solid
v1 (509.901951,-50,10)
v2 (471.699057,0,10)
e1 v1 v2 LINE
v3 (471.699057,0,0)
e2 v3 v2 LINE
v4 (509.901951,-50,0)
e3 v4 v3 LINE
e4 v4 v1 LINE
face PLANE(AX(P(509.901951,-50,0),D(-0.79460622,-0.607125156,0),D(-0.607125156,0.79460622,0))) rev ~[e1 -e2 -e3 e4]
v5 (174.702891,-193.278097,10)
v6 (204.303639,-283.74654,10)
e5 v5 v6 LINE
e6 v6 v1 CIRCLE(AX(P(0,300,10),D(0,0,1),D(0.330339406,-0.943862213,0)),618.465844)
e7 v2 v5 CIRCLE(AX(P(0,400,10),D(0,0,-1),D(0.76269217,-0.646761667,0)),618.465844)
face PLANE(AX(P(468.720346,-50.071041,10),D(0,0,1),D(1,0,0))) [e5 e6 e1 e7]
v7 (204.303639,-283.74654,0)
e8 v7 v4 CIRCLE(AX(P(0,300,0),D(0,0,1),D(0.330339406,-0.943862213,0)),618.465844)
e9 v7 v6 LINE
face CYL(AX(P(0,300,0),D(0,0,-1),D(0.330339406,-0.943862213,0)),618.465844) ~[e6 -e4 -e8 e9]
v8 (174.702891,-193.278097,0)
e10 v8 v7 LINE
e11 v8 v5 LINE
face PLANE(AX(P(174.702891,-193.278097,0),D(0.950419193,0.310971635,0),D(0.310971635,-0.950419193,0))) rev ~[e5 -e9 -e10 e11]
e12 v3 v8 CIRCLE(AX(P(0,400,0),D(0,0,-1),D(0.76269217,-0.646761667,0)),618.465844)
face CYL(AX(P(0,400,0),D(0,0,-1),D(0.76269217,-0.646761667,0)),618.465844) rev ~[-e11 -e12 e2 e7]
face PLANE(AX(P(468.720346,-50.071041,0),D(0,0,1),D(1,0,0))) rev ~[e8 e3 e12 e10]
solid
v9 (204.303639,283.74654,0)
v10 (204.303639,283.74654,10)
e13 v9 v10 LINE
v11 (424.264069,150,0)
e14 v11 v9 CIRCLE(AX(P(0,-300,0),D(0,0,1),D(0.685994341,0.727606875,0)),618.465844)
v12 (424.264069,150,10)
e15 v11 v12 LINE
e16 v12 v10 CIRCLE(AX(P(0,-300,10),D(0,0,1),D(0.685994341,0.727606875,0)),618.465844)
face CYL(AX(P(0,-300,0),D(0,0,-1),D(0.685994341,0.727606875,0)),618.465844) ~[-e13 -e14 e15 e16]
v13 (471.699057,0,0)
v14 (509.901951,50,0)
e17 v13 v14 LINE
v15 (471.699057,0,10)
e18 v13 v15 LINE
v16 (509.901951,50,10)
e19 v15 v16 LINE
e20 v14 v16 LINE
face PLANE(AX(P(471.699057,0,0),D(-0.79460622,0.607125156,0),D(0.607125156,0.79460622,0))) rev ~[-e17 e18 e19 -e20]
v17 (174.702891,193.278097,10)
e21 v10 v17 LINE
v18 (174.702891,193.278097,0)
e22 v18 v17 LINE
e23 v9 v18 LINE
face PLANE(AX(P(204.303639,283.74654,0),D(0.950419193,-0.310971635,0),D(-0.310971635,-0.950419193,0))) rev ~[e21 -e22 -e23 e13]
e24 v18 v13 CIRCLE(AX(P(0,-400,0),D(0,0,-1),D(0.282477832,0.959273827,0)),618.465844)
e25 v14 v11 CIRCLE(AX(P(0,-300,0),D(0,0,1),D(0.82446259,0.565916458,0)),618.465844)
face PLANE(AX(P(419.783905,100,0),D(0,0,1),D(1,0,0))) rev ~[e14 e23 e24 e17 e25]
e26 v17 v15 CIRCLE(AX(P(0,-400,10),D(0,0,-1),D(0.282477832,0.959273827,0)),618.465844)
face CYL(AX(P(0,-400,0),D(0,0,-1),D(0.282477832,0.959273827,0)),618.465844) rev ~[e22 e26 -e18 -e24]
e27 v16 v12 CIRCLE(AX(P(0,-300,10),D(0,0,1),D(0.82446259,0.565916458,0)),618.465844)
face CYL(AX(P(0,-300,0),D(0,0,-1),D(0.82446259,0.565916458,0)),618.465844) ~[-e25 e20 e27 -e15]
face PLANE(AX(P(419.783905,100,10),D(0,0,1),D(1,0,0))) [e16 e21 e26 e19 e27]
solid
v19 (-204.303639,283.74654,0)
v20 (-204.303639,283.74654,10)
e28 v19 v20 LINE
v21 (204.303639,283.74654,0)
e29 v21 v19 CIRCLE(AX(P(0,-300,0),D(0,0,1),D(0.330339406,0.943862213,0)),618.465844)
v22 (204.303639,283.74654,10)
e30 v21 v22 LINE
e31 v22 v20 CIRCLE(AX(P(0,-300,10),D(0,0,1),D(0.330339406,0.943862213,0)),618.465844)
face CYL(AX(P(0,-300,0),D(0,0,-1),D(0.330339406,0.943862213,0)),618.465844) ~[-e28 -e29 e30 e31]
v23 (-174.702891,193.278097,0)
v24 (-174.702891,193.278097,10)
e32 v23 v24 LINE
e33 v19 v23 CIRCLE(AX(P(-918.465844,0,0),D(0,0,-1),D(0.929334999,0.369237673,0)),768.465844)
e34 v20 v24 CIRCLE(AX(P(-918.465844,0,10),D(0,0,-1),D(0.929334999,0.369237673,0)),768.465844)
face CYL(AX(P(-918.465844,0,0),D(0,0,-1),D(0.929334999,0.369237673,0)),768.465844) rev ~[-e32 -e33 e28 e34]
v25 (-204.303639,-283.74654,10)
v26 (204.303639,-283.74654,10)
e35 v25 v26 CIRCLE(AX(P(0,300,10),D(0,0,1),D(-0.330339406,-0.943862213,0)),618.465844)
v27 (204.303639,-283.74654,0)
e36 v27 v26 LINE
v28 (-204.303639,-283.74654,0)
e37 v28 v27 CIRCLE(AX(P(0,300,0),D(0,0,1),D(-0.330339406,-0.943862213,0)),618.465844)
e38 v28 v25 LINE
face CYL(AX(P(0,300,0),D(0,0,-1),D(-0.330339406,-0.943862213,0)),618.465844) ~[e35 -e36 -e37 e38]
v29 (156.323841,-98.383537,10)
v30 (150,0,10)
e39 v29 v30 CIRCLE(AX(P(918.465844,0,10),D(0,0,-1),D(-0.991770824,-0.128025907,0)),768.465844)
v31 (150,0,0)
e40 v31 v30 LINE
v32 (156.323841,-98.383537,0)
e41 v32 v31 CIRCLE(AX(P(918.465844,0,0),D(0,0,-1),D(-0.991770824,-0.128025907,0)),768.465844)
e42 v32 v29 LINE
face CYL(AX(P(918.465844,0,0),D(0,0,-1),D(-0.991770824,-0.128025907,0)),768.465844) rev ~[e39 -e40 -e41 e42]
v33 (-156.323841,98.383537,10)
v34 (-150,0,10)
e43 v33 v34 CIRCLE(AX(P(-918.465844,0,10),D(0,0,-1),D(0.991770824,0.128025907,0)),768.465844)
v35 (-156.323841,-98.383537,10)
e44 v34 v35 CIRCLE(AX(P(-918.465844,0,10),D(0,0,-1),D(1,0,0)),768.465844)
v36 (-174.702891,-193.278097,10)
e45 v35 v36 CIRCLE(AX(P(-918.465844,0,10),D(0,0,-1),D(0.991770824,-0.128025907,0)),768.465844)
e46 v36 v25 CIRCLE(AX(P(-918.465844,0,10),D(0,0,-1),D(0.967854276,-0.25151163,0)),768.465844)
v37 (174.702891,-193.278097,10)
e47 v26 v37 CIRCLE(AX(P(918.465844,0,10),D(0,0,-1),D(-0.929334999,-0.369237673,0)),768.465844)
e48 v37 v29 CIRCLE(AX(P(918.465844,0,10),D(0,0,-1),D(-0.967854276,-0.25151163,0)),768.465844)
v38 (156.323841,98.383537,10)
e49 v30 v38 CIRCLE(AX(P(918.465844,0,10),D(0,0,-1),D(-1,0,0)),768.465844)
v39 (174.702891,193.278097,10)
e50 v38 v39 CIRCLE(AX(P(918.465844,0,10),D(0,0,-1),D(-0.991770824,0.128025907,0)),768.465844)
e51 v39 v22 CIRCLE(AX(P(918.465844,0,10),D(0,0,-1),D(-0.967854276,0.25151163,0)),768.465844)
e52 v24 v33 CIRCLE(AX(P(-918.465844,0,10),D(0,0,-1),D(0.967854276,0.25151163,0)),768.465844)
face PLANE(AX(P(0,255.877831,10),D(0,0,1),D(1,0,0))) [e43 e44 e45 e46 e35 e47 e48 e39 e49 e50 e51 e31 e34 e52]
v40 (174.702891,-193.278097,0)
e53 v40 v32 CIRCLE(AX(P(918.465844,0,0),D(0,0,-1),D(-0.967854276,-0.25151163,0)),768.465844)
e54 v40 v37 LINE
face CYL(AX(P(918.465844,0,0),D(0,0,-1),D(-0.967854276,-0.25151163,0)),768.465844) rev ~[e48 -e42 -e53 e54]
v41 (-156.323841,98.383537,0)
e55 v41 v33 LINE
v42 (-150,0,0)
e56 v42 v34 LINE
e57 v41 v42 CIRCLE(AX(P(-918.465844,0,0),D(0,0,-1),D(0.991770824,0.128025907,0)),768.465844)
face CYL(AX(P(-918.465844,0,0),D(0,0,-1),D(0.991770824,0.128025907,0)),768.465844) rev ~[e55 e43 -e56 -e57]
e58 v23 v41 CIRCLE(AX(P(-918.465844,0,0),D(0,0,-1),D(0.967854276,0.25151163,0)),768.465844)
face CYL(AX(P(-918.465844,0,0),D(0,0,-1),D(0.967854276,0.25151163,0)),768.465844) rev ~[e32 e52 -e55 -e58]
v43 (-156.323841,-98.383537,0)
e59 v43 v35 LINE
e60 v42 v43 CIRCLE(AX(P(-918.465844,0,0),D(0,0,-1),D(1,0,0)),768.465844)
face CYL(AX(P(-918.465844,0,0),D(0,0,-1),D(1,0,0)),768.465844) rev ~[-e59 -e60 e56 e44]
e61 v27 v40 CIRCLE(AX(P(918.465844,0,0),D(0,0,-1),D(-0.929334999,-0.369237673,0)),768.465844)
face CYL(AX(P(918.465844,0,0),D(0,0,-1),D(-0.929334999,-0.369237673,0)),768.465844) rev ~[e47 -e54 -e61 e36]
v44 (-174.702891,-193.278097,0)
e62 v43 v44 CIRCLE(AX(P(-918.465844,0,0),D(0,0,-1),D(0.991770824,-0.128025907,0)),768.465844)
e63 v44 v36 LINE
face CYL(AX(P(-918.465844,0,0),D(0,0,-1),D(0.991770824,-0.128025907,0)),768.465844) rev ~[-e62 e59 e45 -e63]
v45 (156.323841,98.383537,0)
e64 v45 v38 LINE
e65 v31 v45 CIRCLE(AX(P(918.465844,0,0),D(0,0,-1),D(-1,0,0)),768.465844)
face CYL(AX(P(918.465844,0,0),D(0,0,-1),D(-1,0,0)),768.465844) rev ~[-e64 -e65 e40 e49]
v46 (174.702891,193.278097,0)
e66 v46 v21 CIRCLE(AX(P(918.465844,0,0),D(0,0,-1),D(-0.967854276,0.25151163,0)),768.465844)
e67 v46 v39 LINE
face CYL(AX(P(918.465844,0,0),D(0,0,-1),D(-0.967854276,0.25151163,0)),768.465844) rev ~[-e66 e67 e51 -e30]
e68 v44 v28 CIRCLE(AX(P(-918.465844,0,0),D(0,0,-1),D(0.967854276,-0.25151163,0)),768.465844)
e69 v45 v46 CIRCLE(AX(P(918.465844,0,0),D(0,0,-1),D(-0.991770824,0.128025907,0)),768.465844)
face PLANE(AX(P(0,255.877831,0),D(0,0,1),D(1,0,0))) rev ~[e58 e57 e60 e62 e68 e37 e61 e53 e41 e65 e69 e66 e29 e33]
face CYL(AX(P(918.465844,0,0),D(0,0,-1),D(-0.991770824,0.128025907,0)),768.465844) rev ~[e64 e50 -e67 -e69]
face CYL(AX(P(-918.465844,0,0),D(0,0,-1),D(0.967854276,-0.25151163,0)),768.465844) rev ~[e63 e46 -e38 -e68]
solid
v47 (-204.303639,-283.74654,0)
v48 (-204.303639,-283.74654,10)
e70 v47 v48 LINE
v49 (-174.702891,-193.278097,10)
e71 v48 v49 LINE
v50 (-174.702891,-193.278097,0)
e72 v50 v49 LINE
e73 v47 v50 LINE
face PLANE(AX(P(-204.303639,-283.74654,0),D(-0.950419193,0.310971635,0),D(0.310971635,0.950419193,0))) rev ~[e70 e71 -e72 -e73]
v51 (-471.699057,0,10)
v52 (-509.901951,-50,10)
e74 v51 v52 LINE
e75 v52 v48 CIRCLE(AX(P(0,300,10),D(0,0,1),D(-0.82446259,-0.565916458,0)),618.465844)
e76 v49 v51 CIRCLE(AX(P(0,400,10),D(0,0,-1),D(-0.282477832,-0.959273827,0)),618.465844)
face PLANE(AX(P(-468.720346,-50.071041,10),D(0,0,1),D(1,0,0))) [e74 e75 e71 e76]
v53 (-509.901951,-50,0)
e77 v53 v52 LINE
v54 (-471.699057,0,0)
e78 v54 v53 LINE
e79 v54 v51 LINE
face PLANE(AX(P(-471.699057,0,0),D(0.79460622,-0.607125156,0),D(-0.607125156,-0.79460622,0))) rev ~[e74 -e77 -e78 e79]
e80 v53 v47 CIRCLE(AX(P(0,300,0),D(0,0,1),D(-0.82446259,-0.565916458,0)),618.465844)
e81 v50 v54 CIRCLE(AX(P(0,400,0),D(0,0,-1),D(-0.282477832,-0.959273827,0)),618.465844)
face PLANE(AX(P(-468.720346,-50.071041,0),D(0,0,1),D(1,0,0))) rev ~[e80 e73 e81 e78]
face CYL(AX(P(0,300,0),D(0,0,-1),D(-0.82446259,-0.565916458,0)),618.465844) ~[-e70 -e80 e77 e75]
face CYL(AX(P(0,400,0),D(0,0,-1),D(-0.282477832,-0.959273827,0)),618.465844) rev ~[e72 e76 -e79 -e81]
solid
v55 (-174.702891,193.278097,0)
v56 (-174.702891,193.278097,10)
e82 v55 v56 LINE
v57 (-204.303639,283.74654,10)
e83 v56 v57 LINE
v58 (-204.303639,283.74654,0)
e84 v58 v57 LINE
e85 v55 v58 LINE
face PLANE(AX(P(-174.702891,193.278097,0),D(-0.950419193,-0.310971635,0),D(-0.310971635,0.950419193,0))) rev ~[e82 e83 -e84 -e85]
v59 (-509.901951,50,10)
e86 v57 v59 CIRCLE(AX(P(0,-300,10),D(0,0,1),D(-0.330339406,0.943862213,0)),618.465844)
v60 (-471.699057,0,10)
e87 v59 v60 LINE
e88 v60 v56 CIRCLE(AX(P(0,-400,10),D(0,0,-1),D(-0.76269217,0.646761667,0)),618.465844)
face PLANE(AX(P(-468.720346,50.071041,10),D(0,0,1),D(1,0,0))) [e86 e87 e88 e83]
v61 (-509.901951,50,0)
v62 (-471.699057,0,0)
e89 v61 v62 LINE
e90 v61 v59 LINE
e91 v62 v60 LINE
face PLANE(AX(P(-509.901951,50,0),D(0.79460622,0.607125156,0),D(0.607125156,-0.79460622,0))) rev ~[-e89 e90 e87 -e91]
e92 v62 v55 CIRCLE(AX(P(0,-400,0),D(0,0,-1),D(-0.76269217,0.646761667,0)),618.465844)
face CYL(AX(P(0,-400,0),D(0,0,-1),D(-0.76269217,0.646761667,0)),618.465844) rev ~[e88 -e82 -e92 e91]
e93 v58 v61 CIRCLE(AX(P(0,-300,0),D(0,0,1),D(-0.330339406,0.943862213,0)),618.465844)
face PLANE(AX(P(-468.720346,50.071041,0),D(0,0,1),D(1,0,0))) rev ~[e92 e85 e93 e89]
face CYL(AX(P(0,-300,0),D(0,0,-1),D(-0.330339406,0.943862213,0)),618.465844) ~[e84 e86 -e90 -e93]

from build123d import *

# Parameters (mm, degrees)
F1_DEPTH = 10
F2_DEPTH = 10


# Not quite as in the source:
# - a feature names something its author has since deleted; it is built from what else it names


with BuildPart() as f1:
    # F0 (on Top) → F1 (new body)
    with BuildSketch(Plane.XY):
        with BuildLine():
            ThreePointArc((-424.2640687119, 50), (-448.6785937405, 74.3387267802), (-471.6990566028, 100))
            ThreePointArc((-471.6990566028, 100), (-491.4368064238, 75.4861719051), (-509.9019513593, 50))
            Line((-509.9019513593, 50), (-471.6990566028, 0))
            ThreePointArc((-471.6990566028, 0), (-448.6785937405, 25.6612732197), (-424.2640687119, 50))
        make_face()
        with BuildLine():
            ThreePointArc((-364.005494464, 100), (-394.9268616559, 124.0454076883), (-424.2640687119, 150))
            ThreePointArc((-424.2640687119, 150), (-448.6785937405, 125.6612732197), (-471.6990566028, 100))
            ThreePointArc((-471.6990566028, 100), (-448.6785937405, 74.3387267802), (-424.2640687119, 50))
            ThreePointArc((-424.2640687119, 50), (-394.9268616559, 75.9545923117), (-364.005494464, 100))
        make_face()
        with BuildLine():
            Line((-174.7028906779, 193.2780966703), (-204.3036394289, 283.7465399607))
            ThreePointArc((-204.3036394289, 283.7465399607), (-321.3197397721, 228.444533355), (-424.2640687119, 150))
            ThreePointArc((-424.2640687119, 150), (-394.9268616559, 124.0454076883), (-364.005494464, 100))
            ThreePointArc((-364.005494464, 100), (-273.362180788, 154.7730329737), (-174.7028906779, 193.2780966703))
        make_face()
    extrude(amount=F1_DEPTH)


with BuildPart() as f1b:
    # F0 (on Top) → F1, piece 2 (new body)
    with BuildSketch(Plane.XY):
        with BuildLine():
            ThreePointArc((471.6990566028, 100), (448.6785937405, 125.6612732197), (424.2640687119, 150))
            ThreePointArc((424.2640687119, 150), (394.9268616559, 124.0454076883), (364.005494464, 100))
            ThreePointArc((364.005494464, 100), (394.9268616559, 75.9545923117), (424.2640687119, 50))
            ThreePointArc((424.2640687119, 50), (448.6785937405, 74.3387267802), (471.6990566028, 100))
        make_face()
        with BuildLine():
            ThreePointArc((509.9019513593, 50), (491.4368064238, 75.4861719051), (471.6990566028, 100))
            ThreePointArc((471.6990566028, 100), (448.6785937405, 74.3387267802), (424.2640687119, 50))
            ThreePointArc((424.2640687119, 50), (448.6785937405, 25.6612732197), (471.6990566028, 0))
            Line((471.6990566028, 0), (509.9019513593, 50))
        make_face()
        with BuildLine():
            ThreePointArc((424.2640687119, 150), (321.3197397721, 228.444533355), (204.3036394289, 283.7465399607))
            Line((204.3036394289, 283.7465399607), (174.7028906779, 193.2780966703))
            ThreePointArc((174.7028906779, 193.2780966703), (273.362180788, 154.7730329737), (364.005494464, 100))
            ThreePointArc((364.005494464, 100), (394.9268616559, 124.0454076883), (424.2640687119, 150))
        make_face()
    extrude(amount=F1_DEPTH)


with BuildPart() as f1c:
    # F0 (on Top) → F1, piece 3 (new body)
    with BuildSketch(Plane.XY):
        with BuildLine():
            ThreePointArc((-424.2640687119, -50), (-448.6785937405, -25.6612732197), (-471.6990566028, 0))
            Line((-471.6990566028, 0), (-509.9019513593, -50))
            ThreePointArc((-509.9019513593, -50), (-491.4368064238, -75.4861719051), (-471.6990566028, -100))
            ThreePointArc((-471.6990566028, -100), (-448.6785937405, -74.3387267802), (-424.2640687119, -50))
        make_face()
        with BuildLine():
            ThreePointArc((-174.7028906779, -193.2780966703), (-307.9326352574, -136.3557514779), (-424.2640687119, -50))
            ThreePointArc((-424.2640687119, -50), (-448.6785937405, -74.3387267802), (-471.6990566028, -100))
            ThreePointArc((-471.6990566028, -100), (-350.2650553473, -209.7199142692), (-204.3036394289, -283.7465399607))
            Line((-204.3036394289, -283.7465399607), (-174.7028906779, -193.2780966703))
        make_face()
    extrude(amount=F1_DEPTH)


with BuildPart() as f1d:
    # F0 (on Top) → F1, piece 4 (new body)
    with BuildSketch(Plane.XY):
        with BuildLine():
            Line((509.9019513593, -50), (471.6990566028, 0))
            ThreePointArc((471.6990566028, 0), (448.6785937405, -25.6612732197), (424.2640687119, -50))
            ThreePointArc((424.2640687119, -50), (448.6785937405, -74.3387267802), (471.6990566028, -100))
            ThreePointArc((471.6990566028, -100), (491.4368064238, -75.4861719051), (509.9019513593, -50))
        make_face()
        with BuildLine():
            ThreePointArc((471.6990566028, -100), (448.6785937405, -74.3387267802), (424.2640687119, -50))
            ThreePointArc((424.2640687119, -50), (307.9326352574, -136.3557514779), (174.7028906779, -193.2780966703))
            Line((174.7028906779, -193.2780966703), (204.3036394289, -283.7465399607))
            ThreePointArc((204.3036394289, -283.7465399607), (350.2650553473, -209.7199142692), (471.6990566028, -100))
        make_face()
    extrude(amount=F1_DEPTH)


with BuildPart() as f2:
    # F0 (on Top) → F2 (new body)
    with BuildSketch(Plane.XY):
        with BuildLine():
            ThreePointArc((174.7028906779, 193.2780966703), (188.1011567973, 238.9710799865), (204.3036394289, 283.7465399607))
            ThreePointArc((204.3036394289, 283.7465399607), (0, 318.4658438426), (-204.3036394289, 283.7465399607))
            ThreePointArc((-204.3036394289, 283.7465399607), (-188.1011567973, 238.9710799865), (-174.7028906779, 193.2780966703))
            ThreePointArc((-174.7028906779, 193.2780966703), (0, 218.4658438426), (174.7028906779, 193.2780966703))
        make_face()
        with BuildLine():
            ThreePointArc((156.3238407432, 98.383536551), (164.0199022999, 146.1200685822), (174.7028906779, 193.2780966703))
            ThreePointArc((174.7028906779, 193.2780966703), (0, 218.4658438426), (-174.7028906779, 193.2780966703))
            ThreePointArc((-174.7028906779, 193.2780966703), (-164.0199022999, 146.1200685822), (-156.3238407432, 98.383536551))
            ThreePointArc((-156.3238407432, 98.383536551), (0, 118.4658438426), (156.3238407431, 98.383536551))
        make_face()
        with BuildLine():
            ThreePointArc((150, 0), (151.5825897901, 49.2932835842), (156.3238407432, 98.383536551))
            ThreePointArc((156.3238407431, 98.383536551), (0, 118.4658438426), (-156.3238407432, 98.383536551))
            ThreePointArc((-156.3238407432, 98.383536551), (-151.5825897901, 49.2932835842), (-150, 0))
            ThreePointArc((-150, 0), (0, -18.4658438426), (150, 0))
        make_face()
        with BuildLine():
            ThreePointArc((156.3238407432, -98.383536551), (151.5825897901, -49.2932835842), (150, 0))
            ThreePointArc((150, 0), (0, -18.4658438426), (-150, 0))
            ThreePointArc((-150, 0), (-151.5825897901, -49.2932835842), (-156.3238407432, -98.383536551))
            ThreePointArc((-156.3238407432, -98.383536551), (0, -118.4658438426), (156.3238407431, -98.383536551))
        make_face()
        with BuildLine():
            ThreePointArc((174.7028906779, -193.2780966703), (164.0199022999, -146.1200685822), (156.3238407432, -98.383536551))
            ThreePointArc((156.3238407431, -98.383536551), (0, -118.4658438426), (-156.3238407432, -98.383536551))
            ThreePointArc((-156.3238407432, -98.383536551), (-164.0199022999, -146.1200685822), (-174.7028906779, -193.2780966703))
            ThreePointArc((-174.7028906779, -193.2780966703), (0, -218.4658438426), (174.7028906779, -193.2780966703))
        make_face()
        with BuildLine():
            ThreePointArc((204.3036394289, -283.7465399607), (188.1011567973, -238.9710799865), (174.7028906779, -193.2780966703))
            ThreePointArc((174.7028906779, -193.2780966703), (0, -218.4658438426), (-174.7028906779, -193.2780966703))
            ThreePointArc((-174.7028906779, -193.2780966703), (-188.1011567973, -238.9710799865), (-204.3036394289, -283.7465399607))
            ThreePointArc((-204.3036394289, -283.7465399607), (0, -318.4658438426), (204.3036394289, -283.7465399607))
        make_face()
    extrude(amount=F2_DEPTH)


solid = Compound([f1.part, f1b.part, f1c.part, f1d.part, f2.part])
